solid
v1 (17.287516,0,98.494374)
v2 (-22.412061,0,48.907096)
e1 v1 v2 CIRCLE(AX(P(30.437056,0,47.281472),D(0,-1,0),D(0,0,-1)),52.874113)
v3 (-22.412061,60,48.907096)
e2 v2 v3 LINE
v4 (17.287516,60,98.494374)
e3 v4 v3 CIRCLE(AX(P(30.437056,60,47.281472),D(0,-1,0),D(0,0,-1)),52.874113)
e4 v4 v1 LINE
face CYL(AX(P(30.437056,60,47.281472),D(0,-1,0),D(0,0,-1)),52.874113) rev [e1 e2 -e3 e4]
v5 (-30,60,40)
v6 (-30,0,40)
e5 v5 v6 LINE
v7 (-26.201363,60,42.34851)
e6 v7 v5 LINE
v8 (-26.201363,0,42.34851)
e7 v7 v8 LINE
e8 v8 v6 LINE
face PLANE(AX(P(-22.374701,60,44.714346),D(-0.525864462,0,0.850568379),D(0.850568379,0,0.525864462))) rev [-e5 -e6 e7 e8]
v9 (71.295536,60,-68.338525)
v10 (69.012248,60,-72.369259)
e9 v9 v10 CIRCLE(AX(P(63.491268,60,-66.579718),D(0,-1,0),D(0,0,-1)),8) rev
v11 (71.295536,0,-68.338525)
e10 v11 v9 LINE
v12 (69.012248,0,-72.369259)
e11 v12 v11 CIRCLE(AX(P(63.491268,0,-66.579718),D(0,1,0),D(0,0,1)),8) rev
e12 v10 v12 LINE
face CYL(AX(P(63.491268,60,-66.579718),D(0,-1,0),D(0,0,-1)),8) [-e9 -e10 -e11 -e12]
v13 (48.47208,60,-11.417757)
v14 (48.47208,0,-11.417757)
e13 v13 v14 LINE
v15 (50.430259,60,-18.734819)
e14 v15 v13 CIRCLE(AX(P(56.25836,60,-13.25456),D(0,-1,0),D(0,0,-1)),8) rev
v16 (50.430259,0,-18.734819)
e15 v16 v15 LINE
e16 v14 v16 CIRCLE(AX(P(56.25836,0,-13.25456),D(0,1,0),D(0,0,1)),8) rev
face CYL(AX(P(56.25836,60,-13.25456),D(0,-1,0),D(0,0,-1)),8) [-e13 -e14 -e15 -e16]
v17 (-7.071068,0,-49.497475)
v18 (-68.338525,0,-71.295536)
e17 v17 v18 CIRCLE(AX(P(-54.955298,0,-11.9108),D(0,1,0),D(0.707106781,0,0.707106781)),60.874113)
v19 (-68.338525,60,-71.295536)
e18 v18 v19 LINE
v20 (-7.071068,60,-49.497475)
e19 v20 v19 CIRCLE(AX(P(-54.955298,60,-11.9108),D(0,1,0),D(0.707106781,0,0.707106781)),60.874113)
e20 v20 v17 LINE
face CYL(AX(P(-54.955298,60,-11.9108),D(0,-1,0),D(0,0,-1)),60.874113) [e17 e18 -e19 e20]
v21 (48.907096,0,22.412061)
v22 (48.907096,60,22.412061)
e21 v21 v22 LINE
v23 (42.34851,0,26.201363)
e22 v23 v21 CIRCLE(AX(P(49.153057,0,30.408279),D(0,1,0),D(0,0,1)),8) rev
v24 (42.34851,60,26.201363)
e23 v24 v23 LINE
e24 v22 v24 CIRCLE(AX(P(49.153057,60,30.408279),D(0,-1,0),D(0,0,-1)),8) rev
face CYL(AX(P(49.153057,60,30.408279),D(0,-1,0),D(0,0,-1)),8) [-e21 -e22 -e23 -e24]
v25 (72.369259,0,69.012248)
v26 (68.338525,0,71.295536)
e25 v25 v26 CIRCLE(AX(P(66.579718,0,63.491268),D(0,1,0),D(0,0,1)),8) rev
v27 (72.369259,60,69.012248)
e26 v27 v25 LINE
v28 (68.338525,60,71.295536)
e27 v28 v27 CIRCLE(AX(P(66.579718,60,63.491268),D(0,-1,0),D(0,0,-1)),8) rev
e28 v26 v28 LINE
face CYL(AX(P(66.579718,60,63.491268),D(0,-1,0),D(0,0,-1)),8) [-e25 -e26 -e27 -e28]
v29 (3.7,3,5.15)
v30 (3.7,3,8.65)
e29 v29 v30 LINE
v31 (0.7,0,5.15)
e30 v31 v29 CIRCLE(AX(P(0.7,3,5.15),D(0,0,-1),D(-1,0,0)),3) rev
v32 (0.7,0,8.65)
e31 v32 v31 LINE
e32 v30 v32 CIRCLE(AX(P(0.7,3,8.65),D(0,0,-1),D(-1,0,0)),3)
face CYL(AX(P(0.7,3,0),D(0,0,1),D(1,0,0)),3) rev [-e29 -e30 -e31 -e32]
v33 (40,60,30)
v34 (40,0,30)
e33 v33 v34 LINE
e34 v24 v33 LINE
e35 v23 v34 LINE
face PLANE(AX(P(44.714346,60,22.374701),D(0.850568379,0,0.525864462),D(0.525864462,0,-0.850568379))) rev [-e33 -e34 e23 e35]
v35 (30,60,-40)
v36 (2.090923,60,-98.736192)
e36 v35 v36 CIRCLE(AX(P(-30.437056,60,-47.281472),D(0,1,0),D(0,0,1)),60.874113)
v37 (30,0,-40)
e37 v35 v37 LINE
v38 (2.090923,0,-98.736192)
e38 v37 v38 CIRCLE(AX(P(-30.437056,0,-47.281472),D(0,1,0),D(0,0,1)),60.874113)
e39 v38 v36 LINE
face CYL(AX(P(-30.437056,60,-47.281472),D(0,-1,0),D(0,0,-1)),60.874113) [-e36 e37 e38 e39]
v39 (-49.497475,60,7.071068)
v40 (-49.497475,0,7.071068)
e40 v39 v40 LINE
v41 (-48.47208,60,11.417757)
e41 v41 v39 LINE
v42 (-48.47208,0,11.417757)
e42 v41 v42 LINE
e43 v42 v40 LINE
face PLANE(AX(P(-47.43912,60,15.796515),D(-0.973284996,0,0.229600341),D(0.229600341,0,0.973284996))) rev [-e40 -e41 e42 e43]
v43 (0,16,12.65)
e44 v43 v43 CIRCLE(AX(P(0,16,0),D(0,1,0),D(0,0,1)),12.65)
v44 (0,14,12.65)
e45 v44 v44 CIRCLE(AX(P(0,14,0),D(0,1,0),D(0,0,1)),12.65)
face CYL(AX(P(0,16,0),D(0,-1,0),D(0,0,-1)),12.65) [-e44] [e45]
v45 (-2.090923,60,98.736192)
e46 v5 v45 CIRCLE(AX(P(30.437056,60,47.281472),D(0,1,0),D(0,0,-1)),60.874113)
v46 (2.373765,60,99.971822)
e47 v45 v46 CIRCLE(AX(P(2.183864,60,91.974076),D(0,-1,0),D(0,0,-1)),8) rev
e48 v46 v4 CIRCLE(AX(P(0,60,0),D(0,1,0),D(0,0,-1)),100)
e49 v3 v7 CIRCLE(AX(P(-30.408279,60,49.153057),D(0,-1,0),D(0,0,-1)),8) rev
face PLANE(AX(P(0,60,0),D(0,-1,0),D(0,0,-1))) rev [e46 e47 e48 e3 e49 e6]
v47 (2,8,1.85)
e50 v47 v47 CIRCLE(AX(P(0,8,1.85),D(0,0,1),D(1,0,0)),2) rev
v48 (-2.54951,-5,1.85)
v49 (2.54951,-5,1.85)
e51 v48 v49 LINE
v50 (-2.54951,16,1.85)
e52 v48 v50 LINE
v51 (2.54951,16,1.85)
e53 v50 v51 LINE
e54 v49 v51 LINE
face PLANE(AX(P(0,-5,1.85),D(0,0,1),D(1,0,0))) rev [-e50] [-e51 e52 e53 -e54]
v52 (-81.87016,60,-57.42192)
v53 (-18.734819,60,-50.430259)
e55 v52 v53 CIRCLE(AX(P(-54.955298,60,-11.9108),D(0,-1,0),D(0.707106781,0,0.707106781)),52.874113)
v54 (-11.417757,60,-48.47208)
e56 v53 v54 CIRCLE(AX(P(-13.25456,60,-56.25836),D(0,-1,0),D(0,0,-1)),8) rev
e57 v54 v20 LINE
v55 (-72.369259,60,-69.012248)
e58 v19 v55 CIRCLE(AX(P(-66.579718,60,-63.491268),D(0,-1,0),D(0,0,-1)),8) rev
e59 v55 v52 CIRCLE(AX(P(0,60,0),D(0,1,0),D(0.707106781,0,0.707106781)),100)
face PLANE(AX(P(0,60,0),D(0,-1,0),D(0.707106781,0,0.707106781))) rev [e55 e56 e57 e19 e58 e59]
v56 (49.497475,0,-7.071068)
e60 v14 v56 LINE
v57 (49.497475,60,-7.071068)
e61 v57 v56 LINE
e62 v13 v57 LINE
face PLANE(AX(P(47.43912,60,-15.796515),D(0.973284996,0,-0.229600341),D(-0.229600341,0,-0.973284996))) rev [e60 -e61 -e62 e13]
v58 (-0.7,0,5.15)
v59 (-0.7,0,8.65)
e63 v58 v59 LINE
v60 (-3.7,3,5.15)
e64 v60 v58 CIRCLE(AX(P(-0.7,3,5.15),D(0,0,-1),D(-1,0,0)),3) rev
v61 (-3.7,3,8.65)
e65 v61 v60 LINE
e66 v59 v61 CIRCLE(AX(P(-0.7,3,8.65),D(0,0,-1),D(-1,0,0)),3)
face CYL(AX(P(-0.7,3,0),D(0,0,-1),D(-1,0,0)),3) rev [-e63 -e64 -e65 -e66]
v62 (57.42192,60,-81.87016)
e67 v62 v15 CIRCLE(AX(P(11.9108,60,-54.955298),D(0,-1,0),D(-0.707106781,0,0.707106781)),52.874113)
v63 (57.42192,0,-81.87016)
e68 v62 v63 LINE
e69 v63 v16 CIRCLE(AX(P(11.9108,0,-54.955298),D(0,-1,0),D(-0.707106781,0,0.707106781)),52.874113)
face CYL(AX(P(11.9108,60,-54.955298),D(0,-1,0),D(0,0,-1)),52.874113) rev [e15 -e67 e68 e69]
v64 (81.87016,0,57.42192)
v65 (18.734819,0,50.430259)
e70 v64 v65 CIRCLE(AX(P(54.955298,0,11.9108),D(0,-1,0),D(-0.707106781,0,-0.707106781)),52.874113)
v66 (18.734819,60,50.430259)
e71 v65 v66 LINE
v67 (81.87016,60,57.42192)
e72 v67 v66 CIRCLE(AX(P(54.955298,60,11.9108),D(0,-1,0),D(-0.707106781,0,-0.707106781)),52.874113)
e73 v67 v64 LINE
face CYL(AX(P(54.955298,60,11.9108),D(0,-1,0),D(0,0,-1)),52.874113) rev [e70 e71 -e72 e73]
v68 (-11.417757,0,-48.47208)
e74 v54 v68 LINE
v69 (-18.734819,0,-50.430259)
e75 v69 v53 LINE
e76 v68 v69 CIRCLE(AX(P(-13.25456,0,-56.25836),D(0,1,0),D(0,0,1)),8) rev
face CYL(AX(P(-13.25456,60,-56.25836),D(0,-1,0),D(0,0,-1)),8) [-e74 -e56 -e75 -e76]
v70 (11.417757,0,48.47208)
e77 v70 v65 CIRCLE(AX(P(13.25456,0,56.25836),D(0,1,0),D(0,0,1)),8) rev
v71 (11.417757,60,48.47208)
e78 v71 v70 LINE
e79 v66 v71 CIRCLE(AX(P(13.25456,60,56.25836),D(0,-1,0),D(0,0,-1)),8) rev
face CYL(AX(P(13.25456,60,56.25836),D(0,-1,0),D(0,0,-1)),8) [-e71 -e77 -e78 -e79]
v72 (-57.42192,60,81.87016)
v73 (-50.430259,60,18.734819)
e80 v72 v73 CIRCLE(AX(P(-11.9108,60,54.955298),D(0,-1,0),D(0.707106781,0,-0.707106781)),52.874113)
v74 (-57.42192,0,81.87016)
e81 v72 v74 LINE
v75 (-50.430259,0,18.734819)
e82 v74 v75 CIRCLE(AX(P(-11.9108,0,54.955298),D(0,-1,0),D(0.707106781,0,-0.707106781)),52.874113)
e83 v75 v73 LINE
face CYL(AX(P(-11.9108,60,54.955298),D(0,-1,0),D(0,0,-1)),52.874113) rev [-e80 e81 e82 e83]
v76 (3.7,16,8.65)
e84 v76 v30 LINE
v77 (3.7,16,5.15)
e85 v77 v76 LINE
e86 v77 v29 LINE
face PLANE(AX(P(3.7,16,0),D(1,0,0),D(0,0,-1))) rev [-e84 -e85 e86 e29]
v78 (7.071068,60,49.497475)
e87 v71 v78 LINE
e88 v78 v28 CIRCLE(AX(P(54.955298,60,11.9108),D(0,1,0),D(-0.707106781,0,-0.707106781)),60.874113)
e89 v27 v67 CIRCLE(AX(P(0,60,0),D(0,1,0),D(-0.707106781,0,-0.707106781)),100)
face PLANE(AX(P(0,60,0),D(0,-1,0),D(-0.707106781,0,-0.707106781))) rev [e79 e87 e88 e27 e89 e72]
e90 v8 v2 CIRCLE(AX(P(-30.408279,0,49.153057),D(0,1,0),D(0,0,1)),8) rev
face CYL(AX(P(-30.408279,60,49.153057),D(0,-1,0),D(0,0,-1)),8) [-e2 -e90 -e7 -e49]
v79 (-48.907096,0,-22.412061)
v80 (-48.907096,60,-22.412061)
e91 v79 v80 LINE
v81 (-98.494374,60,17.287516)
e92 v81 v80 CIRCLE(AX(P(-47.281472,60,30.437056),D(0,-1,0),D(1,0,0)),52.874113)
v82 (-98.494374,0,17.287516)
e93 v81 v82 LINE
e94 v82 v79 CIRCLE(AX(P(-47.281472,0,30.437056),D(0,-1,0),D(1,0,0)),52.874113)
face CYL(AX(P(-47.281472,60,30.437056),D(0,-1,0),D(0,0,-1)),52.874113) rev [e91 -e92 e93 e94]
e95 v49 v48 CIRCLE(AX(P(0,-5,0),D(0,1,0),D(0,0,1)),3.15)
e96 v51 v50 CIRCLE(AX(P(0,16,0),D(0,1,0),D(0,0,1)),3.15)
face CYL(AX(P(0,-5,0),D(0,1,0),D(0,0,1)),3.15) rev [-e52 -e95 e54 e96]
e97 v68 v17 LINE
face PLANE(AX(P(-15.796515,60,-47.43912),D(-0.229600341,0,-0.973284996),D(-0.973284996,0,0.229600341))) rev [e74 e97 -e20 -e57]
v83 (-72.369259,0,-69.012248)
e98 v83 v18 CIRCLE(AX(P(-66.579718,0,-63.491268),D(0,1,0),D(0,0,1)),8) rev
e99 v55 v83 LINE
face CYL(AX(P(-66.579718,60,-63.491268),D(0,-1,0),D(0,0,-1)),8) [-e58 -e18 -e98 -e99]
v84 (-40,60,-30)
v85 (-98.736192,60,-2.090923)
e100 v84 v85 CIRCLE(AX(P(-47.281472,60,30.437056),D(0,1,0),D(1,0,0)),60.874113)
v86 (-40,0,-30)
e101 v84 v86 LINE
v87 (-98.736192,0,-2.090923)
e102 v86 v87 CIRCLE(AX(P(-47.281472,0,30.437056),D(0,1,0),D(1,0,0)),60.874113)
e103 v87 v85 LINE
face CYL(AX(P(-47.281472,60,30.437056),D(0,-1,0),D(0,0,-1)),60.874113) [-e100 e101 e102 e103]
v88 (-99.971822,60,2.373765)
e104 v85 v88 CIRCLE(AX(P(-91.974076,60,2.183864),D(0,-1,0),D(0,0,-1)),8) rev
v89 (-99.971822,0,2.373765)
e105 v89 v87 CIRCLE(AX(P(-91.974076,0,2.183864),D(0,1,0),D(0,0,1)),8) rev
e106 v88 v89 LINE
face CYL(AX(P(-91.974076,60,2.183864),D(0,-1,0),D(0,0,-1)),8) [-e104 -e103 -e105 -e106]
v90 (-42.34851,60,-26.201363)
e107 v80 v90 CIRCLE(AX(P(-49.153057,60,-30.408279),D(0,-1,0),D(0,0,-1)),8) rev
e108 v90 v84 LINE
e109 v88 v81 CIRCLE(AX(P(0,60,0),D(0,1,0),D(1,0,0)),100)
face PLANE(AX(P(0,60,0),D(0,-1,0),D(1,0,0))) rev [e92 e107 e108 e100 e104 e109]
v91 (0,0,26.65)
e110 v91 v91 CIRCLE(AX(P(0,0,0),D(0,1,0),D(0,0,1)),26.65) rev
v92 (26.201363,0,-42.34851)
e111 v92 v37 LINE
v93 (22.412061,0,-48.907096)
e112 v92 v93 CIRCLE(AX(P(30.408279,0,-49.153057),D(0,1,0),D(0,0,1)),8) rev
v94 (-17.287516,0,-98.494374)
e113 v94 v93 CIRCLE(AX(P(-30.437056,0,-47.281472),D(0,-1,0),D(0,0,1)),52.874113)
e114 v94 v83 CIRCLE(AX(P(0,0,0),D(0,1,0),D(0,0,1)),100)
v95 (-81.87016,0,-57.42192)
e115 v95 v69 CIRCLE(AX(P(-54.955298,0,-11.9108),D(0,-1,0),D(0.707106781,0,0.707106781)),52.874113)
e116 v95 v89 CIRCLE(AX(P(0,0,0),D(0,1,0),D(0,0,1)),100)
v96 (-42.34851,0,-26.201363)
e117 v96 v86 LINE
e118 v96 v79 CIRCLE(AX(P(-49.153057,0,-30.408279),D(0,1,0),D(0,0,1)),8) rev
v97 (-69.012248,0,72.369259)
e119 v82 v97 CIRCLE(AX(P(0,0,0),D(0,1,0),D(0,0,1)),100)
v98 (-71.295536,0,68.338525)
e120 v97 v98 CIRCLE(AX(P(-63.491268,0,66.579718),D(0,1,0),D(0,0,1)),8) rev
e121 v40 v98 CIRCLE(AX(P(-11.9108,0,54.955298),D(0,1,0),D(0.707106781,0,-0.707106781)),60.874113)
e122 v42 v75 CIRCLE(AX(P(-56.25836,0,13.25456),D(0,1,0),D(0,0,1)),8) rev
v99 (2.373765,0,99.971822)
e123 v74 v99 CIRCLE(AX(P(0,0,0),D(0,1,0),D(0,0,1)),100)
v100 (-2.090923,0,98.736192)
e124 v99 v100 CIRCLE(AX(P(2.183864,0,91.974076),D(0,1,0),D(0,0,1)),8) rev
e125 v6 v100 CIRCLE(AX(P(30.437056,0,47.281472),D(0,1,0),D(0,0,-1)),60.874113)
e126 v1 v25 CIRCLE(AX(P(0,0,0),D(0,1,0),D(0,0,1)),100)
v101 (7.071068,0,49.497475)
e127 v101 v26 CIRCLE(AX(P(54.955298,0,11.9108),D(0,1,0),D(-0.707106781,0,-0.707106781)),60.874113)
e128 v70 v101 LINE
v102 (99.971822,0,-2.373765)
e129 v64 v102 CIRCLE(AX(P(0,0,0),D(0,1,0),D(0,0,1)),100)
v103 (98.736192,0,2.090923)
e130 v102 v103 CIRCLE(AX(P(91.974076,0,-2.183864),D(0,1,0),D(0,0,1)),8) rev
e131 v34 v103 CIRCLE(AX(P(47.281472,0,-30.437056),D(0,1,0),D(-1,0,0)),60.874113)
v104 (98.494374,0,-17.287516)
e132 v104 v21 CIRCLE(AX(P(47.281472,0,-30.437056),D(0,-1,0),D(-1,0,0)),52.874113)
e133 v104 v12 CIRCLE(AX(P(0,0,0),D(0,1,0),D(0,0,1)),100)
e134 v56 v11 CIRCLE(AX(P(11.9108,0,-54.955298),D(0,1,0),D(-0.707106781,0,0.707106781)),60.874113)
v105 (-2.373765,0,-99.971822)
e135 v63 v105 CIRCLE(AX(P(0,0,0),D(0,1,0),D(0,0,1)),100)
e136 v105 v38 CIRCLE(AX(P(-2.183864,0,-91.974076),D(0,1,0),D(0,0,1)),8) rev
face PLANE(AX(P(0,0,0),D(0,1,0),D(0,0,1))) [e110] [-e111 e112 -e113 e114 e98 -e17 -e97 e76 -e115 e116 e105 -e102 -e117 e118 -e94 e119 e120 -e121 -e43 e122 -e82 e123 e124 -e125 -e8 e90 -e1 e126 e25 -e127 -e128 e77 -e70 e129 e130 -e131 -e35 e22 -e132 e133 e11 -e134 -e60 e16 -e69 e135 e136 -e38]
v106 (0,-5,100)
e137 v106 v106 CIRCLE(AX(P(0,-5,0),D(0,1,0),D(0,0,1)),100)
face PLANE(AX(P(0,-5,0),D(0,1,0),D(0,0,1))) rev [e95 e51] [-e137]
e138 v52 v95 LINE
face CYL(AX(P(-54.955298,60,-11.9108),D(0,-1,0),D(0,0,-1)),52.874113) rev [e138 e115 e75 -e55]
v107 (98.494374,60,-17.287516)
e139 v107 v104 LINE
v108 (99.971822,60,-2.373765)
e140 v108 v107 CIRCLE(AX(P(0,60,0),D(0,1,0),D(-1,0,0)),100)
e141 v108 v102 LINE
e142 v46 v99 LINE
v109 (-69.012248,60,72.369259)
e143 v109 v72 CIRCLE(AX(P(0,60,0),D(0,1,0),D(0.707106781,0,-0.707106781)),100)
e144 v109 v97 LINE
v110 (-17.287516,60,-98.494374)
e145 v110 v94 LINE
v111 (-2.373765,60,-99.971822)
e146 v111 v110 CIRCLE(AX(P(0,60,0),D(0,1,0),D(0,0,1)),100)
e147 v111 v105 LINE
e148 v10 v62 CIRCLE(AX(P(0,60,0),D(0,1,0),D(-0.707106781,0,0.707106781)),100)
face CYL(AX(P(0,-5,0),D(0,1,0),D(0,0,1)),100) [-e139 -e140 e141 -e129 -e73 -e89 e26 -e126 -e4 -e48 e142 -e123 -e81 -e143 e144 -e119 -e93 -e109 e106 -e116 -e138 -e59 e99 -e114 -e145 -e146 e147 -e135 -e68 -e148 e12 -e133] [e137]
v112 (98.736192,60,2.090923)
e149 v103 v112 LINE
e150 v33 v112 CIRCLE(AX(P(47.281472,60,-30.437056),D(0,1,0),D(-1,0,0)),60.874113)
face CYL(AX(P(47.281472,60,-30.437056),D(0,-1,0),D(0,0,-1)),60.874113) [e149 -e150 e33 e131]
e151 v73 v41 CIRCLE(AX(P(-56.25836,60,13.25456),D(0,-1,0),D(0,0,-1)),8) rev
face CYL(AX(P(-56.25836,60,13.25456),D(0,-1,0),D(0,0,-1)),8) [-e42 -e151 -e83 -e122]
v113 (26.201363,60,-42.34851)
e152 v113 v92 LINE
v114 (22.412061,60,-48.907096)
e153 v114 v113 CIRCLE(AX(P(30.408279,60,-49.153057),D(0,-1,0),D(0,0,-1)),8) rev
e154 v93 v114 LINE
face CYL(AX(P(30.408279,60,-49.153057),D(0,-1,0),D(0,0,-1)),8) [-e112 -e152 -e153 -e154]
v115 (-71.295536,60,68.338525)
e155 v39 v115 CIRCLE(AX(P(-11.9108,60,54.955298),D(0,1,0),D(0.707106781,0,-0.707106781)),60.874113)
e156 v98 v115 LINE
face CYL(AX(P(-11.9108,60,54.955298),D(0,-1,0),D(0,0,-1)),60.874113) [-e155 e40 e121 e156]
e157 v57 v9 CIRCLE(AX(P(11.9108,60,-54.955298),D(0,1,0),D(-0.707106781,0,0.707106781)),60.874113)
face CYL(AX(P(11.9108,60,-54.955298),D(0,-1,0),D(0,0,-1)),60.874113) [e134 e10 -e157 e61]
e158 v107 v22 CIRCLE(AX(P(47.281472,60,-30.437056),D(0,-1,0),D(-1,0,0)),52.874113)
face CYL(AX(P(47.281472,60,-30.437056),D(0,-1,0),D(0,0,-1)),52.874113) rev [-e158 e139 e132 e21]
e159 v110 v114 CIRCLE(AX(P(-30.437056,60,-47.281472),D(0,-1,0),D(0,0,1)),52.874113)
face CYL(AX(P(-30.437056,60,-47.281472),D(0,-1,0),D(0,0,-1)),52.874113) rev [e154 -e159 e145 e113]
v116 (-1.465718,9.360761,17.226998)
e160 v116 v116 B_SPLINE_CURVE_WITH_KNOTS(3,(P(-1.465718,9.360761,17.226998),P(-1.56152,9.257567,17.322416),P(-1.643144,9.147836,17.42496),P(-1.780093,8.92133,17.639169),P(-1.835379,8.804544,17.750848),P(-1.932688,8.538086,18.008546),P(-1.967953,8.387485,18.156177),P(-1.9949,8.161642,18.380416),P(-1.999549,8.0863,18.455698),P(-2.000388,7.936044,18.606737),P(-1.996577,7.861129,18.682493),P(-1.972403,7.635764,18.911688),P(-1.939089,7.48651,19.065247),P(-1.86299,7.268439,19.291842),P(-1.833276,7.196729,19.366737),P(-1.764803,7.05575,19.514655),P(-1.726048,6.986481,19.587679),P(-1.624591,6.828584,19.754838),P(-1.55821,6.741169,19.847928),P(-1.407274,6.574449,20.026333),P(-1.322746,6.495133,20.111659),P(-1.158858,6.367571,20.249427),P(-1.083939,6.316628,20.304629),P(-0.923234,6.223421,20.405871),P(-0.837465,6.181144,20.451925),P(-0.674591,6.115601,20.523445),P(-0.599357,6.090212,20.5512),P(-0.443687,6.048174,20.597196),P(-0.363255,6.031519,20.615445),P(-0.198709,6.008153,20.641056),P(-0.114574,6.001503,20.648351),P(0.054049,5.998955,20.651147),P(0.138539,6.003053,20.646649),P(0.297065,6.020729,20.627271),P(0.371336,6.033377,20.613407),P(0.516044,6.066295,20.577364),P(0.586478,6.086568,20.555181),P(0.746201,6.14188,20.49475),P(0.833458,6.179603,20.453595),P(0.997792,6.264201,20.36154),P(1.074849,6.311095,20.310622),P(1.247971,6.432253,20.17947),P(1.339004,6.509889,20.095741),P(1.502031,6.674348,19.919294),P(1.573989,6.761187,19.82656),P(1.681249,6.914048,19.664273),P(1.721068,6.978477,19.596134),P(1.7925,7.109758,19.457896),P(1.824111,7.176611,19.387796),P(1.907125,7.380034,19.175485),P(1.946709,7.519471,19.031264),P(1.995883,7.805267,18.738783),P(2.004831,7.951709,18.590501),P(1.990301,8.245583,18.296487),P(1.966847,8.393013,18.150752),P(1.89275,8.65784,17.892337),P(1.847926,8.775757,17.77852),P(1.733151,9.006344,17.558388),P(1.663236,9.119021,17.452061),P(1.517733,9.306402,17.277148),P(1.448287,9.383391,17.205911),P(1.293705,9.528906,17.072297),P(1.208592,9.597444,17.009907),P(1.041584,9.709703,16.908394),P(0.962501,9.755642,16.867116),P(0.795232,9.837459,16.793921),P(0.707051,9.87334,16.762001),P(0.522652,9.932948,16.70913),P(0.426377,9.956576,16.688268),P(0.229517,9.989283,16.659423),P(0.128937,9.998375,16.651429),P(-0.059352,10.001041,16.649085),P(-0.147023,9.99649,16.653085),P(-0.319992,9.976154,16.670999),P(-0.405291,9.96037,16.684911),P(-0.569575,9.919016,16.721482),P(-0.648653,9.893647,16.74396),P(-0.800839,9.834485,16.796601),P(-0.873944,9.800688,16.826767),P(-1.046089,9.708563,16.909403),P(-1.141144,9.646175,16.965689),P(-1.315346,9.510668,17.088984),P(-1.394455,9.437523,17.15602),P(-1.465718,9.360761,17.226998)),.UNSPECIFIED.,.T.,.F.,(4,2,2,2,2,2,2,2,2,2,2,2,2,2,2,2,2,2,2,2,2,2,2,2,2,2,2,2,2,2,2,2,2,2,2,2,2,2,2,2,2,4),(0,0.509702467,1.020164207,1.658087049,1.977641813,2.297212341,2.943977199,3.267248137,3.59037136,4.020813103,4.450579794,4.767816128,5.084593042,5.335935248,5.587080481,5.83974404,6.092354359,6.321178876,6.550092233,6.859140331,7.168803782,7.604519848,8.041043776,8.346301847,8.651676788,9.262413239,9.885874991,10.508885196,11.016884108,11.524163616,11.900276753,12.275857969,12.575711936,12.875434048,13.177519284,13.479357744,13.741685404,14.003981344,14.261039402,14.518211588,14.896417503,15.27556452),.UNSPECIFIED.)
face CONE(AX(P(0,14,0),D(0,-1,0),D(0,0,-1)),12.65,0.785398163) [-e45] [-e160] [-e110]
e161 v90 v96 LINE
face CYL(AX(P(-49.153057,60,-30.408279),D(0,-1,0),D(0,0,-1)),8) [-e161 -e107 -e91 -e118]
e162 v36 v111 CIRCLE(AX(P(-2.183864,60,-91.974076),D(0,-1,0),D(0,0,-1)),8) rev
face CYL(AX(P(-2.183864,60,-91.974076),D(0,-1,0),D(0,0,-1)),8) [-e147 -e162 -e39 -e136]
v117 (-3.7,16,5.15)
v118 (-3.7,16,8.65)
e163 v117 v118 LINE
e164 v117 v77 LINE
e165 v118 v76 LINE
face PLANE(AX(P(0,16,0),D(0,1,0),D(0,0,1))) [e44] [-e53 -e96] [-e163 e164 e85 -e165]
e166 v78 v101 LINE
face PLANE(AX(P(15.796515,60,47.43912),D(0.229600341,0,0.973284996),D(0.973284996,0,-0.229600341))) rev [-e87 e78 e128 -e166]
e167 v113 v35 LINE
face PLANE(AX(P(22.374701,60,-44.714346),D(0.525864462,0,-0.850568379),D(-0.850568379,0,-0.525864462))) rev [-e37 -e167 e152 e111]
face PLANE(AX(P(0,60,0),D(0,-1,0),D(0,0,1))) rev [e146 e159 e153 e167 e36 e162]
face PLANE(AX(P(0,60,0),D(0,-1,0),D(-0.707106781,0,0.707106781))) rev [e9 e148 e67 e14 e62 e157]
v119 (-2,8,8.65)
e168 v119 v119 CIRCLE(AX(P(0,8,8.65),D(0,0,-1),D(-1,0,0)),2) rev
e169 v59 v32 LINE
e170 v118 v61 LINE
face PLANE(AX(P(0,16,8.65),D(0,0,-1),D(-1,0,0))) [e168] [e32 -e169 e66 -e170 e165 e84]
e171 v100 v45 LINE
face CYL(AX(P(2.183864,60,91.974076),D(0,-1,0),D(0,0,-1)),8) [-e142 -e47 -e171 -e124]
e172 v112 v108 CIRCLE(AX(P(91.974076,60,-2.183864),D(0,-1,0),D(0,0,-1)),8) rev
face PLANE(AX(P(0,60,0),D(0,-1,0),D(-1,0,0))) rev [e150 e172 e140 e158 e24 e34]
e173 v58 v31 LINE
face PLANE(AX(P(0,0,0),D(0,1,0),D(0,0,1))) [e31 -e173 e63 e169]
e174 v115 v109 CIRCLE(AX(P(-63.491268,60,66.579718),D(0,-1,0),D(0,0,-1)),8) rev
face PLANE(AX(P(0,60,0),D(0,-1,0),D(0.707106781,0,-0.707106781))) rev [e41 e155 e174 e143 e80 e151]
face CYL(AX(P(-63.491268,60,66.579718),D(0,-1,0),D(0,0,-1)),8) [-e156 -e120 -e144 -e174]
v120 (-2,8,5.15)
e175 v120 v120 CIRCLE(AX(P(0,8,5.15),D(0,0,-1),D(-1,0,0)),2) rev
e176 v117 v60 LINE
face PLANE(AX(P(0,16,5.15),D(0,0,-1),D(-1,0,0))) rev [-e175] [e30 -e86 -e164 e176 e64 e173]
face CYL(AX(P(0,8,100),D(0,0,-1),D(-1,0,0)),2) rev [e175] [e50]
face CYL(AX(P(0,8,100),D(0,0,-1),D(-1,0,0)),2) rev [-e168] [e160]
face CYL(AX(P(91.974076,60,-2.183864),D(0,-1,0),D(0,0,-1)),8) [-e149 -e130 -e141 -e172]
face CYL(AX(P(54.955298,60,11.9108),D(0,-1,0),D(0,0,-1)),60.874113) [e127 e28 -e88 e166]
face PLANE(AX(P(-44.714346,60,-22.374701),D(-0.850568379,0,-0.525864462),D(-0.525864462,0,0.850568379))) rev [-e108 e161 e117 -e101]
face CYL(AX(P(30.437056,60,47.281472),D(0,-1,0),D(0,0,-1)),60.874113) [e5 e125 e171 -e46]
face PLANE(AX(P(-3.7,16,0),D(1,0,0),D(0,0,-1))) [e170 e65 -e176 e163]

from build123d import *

# Parameters (mm, degrees)
SKETCH1_R                = 100
BOSS_EXTRUDE1_DEPTH      = 5
BOSS_EXTRUDE2_START      = 16
SKETCH1_3_R              = 12.65
SKETCH1_3_W              = 7.4
SKETCH1_3_H              = 3.5
BOSS_EXTRUDE2_DEPTH      = 16
CHAMFER1_SIZE            = 14
CUT_EXTRUDE1_DEPTH       = 146.988090268
CUT_EXTRUDE1_DEPTH_BACK  = 5.15
SKETCH3_R                = 2
FILLET1_R                = 3
BOSS_EXTRUDE3_START      = 60
BOSS_EXTRUDE3_DEPTH      = 60
FILLET3_R                = 8
FILLET4_R                = 8
CIRPATTERN1_COUNT        = 8
FILLET3_OF_CIRPATTERN1_R = 8
FILLET4_OF_CIRPATTERN1_R = 8


with BuildPart() as part:
    # Sketch1 → Boss-Extrude1 (new body)
    with BuildSketch(Plane(origin=(0, 0, 0), x_dir=(1, 0, 0), z_dir=(0, 1, 0))):
        with Locations(Location((0, 0, 0), (0, 0, 270))):
            Circle(SKETCH1_R)
        with BuildLine():
            Line((2.549509757, -1.85), (-2.549509757, -1.85))
            ThreePointArc((-2.549509757, -1.85), (0, 3.15), (2.549509757, -1.85))
        make_face(mode=Mode.SUBTRACT)
    extrude(amount=-BOSS_EXTRUDE1_DEPTH)

    # Sketch1<3> → Boss-Extrude2 (add)
    with BuildSketch(Plane(origin=(0, 0, 0), x_dir=(1, 0, 0), z_dir=(0, 1, 0)).offset(BOSS_EXTRUDE2_START)):
        with Locations(Location((0, 0, 0), (0, 0, 270))):
            Circle(SKETCH1_3_R)
        with BuildLine():
            Line((2.549509757, -1.85), (-2.549509757, -1.85))
            ThreePointArc((-2.549509757, -1.85), (0, 3.15), (2.549509757, -1.85))
        make_face(mode=Mode.SUBTRACT)
        with Locations((0, -6.9)):
            Rectangle(SKETCH1_3_W, SKETCH1_3_H, mode=Mode.SUBTRACT)
    extrude(amount=-BOSS_EXTRUDE2_DEPTH)

    # Chamfer1
    chamfer1_edges = [part.edges().sort_by_distance(p)[0] for p in [
        (0, 0, -12.65),
    ]]
    chamfer(chamfer1_edges, length=CHAMFER1_SIZE)

    # Sketch3 → Cut-Extrude1 (cut, two sides: drawn at the far end of the back side and taken through both)
    with BuildSketch(Plane.XY.offset(5.15).offset(-CUT_EXTRUDE1_DEPTH_BACK)):
        with Locations(Location((0, 8, 0), (0, 0, 180))):
            Circle(SKETCH3_R)
    extrude(amount=CUT_EXTRUDE1_DEPTH + CUT_EXTRUDE1_DEPTH_BACK, mode=Mode.SUBTRACT)

    # Fillet1
    fillet1_edges = [part.edges().sort_by_distance(p)[0] for p in [
        (3.7, 0, 6.9),
        (-3.7, 0, 6.9),
    ]]
    fillet(fillet1_edges, radius=FILLET1_R)

    # Sketch4 → Boss-Extrude3 (add)
    with BuildSketch(Plane(origin=(0, 0, 0), x_dir=(1, 0, 0), z_dir=(0, 1, 0)).offset(BOSS_EXTRUDE3_START)):
        with BuildLine():
            Line((-22.374700612, -44.714346384), (-30, -40))
            ThreePointArc((-30, -40), (-24.010405369, -74.505202685), (0, -100))
            ThreePointArc((0, -100), (8.67647844, -99.622882521), (17.287515846, -98.494374438))
            ThreePointArc((17.287515846, -98.494374438), (-12.116392899, -78.664202138), (-22.374700612, -44.714346384))
        make_face()
    boss_extrude3 = extrude(amount=-BOSS_EXTRUDE3_DEPTH)

    # Fillet3
    fillet3_edges = [part.edges().sort_by_distance(p)[0] for p in [
        (-22.374700612, 30, 44.714346384),
    ]]
    fillet(fillet3_edges, radius=FILLET3_R)

    # Fillet4
    # the kernel refuses this fillet: 8 mm, written as the material it takes off along each edge
    with BuildSketch(Plane(origin=(0, 66.107971256, 100), x_dir=(0.999929553100501, 0, -0.01186966032505709), z_dir=(0, -1, 0))) as fillet4_piece_1:
        with BuildLine():
            CenterArc((2.278974782, -7.999436425), FILLET4_R, 89.319902589, 33.659920931)
            ThreePointArc((-2.075774552, -1.288537958), (-1.044352376, -0.633854003), (0, 0))
            ThreePointArc((0, 0), (1.186966033, 0.00704469), (2.373932065, 0))
        make_face()
    extrude(amount=66.107971256, mode=Mode.SUBTRACT)

    # CirPattern1: Boss-Extrude3 ×8 about axis
    cirpattern1_axis = Axis((0, 0, 0), (0, 1, 0))
    for i in range(1, CIRPATTERN1_COUNT):
        add(boss_extrude3.rotate(cirpattern1_axis, i * 360 / CIRPATTERN1_COUNT))

    # Fillet3 of CirPattern1
    fillet3_of_cirpattern1_edges = [part.edges().sort_by_distance(p)[0] for p in [
        (15.796515014, 30, 47.439120074),
        (44.714346384, 30, 22.374700612),
        (47.439120074, 30, -15.796515014),
        (22.374700612, 30, -44.714346384),
        (-15.796515014, 30, -47.439120074),
        (-44.714346384, 30, -22.374700612),
        (-47.439120074, 30, 15.796515014),
    ]]
    fillet(fillet3_of_cirpattern1_edges, radius=FILLET3_OF_CIRPATTERN1_R)

    # Fillet4 of CirPattern1
    # the kernel refuses this fillet: 8 mm, written as the material it takes off along each edge
    with BuildSketch(Plane(origin=(70.710678119, 66.107971256, 70.710678119), x_dir=(0.6986638503999697, 0, -0.7154500850124269), z_dir=(0, -1, 0)), Plane(origin=(100, 66.107971256, 0), x_dir=(-0.01186966032505703, 0, -0.9999295531005011), z_dir=(0, -1, 0)), Plane(origin=(70.710678119, 66.107971256, -70.710678119), x_dir=(-0.7154500850124297, 0, -0.6986638503999666), z_dir=(0, -1, 0)), Plane(origin=(0, 66.107971256, -100), x_dir=(-0.999929553100501, 0, 0.011869660325056916), z_dir=(0, -1, 0))) as fillet4_of_cirpattern1_piece_1:
        with BuildLine():
            CenterArc((2.278974782, -7.999436425), FILLET4_OF_CIRPATTERN1_R, 89.319902589, 33.659920931)
            ThreePointArc((-2.075774552, -1.288537958), (-1.044352376, -0.633854003), (0, 0))
            ThreePointArc((0, 0), (1.186966033, 0.00704469), (2.373932065, 0))
        make_face()
    extrude(amount=66.107971256, mode=Mode.SUBTRACT)
    with BuildSketch(Plane(origin=(-70.710678119, 66.107971256, -70.710678119), x_dir=(0.9709251782861501, 0, -0.23938316183476163), z_dir=(0, -1, 0)), Plane(origin=(-100, 66.107971256, 0), x_dir=(0.517278320555659, 0, -0.8558172346261301), z_dir=(0, -1, 0)), Plane(origin=(-70.710678119, 66.107971256, 70.710678119), x_dir=(-0.23938316183476574, 0, -0.9709251782861491), z_dir=(0, -1, 0))) as fillet4_of_cirpattern1_piece_2:
        with BuildLine():
            CenterArc((2.282648109, 7.998389012), FILLET4_OF_CIRPATTERN1_R, 237.489942123, 33.659920931)
            ThreePointArc((-2.016933103, 1.252012103), (-1.012181922, 0.620020763), (0, 0))
            ThreePointArc((0, 0), (1.221594251, -0.012258436), (2.443188502, 0))
        make_face()
    extrude(amount=66.107971256, mode=Mode.SUBTRACT)


solid = part.part
